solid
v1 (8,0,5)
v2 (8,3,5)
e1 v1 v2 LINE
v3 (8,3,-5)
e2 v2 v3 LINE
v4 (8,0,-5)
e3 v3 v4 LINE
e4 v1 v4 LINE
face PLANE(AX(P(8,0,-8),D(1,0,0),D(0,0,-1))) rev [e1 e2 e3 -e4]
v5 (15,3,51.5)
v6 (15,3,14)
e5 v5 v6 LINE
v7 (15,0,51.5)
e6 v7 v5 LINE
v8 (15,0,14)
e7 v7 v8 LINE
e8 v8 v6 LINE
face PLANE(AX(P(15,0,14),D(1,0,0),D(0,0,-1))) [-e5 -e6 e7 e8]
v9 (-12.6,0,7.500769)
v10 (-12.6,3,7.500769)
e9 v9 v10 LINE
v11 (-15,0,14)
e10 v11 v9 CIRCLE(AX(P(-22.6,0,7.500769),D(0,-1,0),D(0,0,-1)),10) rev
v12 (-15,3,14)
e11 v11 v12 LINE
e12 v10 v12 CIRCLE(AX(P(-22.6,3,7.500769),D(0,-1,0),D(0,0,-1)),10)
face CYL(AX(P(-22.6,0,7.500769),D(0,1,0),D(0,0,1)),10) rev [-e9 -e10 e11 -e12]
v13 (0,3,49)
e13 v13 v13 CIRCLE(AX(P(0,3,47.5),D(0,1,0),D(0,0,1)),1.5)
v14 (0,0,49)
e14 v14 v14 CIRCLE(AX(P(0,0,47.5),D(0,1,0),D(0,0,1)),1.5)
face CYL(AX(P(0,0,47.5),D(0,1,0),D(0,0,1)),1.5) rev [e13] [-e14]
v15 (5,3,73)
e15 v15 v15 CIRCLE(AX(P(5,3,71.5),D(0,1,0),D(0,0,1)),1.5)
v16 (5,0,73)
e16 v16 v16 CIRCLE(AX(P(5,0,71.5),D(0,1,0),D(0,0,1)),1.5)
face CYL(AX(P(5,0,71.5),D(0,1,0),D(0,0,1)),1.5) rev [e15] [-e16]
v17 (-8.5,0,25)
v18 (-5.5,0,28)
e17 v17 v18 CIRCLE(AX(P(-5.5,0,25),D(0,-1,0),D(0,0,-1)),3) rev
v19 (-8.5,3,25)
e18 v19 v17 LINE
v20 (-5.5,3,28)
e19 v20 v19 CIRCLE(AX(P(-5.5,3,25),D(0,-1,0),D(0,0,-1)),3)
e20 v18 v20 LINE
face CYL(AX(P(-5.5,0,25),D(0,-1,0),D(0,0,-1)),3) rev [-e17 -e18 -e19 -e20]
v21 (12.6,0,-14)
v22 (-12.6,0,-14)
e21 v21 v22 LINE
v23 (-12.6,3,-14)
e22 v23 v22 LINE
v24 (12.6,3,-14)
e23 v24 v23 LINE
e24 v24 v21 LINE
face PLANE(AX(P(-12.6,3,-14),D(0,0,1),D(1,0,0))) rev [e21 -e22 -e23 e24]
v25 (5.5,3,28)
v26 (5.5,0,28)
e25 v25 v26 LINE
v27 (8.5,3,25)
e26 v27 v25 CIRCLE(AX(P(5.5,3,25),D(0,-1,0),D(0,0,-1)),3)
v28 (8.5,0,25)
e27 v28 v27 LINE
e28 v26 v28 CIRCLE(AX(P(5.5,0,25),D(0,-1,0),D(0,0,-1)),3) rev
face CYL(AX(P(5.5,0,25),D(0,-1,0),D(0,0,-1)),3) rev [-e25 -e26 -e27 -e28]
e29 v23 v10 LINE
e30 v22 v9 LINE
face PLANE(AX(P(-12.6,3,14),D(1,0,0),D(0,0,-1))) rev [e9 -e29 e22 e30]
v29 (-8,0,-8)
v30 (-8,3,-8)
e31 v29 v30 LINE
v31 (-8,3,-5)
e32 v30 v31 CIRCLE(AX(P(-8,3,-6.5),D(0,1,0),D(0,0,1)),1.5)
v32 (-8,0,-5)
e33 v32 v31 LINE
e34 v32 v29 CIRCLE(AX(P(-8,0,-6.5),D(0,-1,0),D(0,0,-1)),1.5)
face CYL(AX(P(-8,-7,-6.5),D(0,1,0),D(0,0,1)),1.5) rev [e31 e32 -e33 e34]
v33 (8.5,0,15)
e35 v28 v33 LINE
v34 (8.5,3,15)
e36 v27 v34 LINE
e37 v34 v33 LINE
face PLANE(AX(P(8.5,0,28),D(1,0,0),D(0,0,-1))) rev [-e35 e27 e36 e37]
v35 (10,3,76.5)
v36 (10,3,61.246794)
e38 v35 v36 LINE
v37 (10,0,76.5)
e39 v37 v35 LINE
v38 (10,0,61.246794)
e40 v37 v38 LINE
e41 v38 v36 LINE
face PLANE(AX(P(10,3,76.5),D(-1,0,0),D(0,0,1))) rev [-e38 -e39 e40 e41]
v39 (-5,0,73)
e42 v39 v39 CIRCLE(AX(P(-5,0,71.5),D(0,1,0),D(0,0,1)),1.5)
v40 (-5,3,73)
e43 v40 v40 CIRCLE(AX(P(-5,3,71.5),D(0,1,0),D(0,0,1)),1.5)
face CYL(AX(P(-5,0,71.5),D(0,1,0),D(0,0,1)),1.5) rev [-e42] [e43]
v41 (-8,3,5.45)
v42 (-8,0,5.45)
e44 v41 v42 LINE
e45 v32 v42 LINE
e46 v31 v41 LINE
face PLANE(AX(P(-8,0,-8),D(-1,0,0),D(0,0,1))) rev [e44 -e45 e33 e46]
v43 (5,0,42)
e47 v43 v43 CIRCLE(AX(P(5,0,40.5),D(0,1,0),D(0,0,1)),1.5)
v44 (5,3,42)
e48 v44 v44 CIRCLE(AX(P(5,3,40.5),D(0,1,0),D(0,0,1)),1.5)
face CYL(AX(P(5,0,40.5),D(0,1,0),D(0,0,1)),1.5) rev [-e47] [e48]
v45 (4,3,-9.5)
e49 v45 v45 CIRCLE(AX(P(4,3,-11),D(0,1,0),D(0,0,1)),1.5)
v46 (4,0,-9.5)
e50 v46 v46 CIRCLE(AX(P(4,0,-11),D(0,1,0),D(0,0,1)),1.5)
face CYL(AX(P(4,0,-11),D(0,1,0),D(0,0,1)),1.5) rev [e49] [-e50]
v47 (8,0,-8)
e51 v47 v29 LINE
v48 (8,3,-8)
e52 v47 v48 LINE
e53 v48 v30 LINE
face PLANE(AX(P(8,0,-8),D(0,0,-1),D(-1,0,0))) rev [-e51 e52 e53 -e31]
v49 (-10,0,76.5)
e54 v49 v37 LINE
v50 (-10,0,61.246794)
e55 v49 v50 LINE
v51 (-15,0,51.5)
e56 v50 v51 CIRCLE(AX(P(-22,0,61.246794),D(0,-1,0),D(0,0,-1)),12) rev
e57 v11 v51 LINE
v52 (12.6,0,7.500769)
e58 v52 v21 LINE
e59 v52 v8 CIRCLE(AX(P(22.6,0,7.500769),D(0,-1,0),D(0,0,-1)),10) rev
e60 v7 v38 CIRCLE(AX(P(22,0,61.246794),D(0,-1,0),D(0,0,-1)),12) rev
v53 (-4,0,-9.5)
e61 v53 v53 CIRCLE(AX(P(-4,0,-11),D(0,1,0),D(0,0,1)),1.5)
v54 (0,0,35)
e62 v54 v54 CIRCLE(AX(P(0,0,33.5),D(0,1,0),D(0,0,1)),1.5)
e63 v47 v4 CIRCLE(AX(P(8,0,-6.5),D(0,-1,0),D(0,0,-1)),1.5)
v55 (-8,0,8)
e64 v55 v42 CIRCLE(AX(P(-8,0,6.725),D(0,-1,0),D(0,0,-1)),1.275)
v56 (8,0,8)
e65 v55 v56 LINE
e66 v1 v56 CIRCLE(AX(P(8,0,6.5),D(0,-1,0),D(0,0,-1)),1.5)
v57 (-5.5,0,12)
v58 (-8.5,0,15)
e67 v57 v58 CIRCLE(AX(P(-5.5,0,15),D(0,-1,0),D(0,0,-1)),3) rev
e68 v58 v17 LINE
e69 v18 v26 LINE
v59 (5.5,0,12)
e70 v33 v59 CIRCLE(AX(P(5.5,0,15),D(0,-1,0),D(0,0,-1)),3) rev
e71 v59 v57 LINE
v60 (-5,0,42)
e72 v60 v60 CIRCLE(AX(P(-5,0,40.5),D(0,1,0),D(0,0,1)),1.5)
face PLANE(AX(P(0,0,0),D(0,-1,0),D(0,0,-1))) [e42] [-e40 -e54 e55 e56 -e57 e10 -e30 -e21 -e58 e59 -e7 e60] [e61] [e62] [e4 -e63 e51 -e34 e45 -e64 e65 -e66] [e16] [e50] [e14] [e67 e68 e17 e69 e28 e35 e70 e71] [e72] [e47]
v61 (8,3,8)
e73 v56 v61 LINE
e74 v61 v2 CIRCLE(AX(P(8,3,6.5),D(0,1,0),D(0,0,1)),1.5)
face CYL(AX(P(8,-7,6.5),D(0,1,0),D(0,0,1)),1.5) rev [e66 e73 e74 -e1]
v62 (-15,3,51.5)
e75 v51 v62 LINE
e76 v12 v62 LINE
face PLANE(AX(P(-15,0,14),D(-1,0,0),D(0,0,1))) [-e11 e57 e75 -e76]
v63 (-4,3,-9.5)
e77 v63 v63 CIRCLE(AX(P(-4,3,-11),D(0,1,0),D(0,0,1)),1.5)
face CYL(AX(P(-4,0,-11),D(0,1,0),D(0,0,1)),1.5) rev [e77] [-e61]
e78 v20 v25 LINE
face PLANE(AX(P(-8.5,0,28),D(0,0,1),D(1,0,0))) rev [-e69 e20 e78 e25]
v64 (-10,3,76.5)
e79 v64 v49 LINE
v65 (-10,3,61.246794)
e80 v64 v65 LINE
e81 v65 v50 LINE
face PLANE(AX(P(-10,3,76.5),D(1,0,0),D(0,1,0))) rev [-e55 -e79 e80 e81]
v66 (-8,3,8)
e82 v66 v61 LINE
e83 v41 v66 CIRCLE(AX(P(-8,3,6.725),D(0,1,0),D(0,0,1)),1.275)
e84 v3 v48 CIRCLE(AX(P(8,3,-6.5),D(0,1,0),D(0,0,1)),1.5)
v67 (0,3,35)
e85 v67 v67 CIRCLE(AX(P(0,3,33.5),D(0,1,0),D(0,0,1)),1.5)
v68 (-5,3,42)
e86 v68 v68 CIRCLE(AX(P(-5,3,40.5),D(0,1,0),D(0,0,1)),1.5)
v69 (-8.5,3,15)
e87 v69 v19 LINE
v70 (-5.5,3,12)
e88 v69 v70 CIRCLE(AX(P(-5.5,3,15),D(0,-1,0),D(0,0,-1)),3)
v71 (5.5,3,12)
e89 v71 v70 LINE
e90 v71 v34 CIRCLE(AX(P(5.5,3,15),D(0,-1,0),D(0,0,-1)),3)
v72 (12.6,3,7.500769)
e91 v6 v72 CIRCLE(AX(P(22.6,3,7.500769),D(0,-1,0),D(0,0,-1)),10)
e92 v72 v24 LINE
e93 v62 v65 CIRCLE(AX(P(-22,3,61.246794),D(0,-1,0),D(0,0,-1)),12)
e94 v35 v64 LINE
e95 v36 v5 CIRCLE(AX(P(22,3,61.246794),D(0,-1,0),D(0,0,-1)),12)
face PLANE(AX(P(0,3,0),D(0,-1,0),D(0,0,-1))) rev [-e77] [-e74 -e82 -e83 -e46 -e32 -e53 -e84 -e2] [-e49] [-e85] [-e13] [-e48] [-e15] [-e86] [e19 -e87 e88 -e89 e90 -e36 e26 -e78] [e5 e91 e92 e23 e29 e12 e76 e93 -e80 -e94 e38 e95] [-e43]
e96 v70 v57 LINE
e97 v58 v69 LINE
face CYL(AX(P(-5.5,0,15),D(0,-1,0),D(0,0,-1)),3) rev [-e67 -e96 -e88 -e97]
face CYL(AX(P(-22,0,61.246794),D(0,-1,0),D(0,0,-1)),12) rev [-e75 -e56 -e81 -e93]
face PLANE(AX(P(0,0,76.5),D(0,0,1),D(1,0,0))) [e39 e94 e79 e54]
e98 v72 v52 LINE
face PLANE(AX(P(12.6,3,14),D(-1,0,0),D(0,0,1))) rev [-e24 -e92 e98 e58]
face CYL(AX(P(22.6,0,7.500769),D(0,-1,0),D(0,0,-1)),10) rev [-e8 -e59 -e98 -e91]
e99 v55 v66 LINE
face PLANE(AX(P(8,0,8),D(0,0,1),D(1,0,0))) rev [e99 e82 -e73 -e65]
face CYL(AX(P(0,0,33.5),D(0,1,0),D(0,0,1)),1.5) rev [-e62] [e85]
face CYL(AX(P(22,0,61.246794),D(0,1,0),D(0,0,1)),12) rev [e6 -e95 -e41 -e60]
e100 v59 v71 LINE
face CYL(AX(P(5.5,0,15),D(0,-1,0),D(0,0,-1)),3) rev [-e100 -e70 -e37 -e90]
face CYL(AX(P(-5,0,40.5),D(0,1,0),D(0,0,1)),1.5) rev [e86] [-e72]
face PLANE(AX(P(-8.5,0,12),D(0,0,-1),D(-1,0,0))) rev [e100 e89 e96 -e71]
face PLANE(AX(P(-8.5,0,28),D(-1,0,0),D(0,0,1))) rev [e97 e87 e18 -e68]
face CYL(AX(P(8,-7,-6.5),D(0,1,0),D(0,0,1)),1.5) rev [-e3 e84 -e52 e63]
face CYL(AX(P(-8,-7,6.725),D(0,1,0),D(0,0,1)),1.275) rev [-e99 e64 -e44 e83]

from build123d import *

# Parameters (mm, degrees)
SKETCH_1_W          = 25.2
SKETCH_1_H          = 28
EXTRUDE_1_DEPTH     = 3
SKETCH_4_R          = 1.5
SKETCH_4_W          = 16
SKETCH_4_H          = 16
CUT_EXTRUDE_3_DEPTH = 20.072493282
SKETCH_6_W          = 30
SKETCH_6_H          = 37.5
EXTRUDE_2_DEPTH     = 3
SKETCH_7_R          = 1.5
CUT_EXTRUDE_5_DEPTH = 54.723830839
FILLET_1_R          = 10
SKETCH_8_W          = 17
SKETCH_8_H          = 16
CUT_EXTRUDE_6_DEPTH = 54.723830839
FILLET_2_R          = 3
SKETCH_5_R          = 1.5
SKETCH_5_R_2        = 1.275
CUT_EXTRUDE_7_DEPTH = 10
SKETCH_9_W          = 20
SKETCH_9_H          = 3
EXTRUDE_3_DEPTH     = 25
FILLET_3_R          = 12
SKETCH_12_R         = 1.5
CUT_EXTRUDE_9_DEPTH = 79.014421744


with BuildPart() as part:
    # 草图1 → 凸台-拉伸1 (new body)
    with BuildSketch(Plane(origin=(0, 0, 0), x_dir=(1, 0, 0), z_dir=(0, 1, 0))):
        Rectangle(SKETCH_1_W, SKETCH_1_H)
    extrude(amount=EXTRUDE_1_DEPTH)

    # 草图4 → 切除-拉伸3 (cut, through all)
    with BuildSketch(Plane(origin=(0, 3, 0), x_dir=(1, 0, 0), z_dir=(0, 1, 0))):
        with Locations(Location((4, 11, 0), (0, 0, 270))):
            Circle(SKETCH_4_R)
        with Locations(Location((-4, 11, 0), (0, 0, 270))):
            Circle(SKETCH_4_R)
        Rectangle(SKETCH_4_W, SKETCH_4_H)
    extrude(amount=-CUT_EXTRUDE_3_DEPTH, mode=Mode.SUBTRACT)

    # 草图6 → 凸台-拉伸2 (add)
    with BuildSketch(Plane(origin=(0, 3, 0), x_dir=(1, 0, 0), z_dir=(0, 1, 0))):
        with Locations((0, -32.75)):
            Rectangle(SKETCH_6_W, SKETCH_6_H)
    extrude(amount=-EXTRUDE_2_DEPTH)

    # 草图7 → 切除-拉伸5 (cut, through all)
    with BuildSketch(Plane(origin=(0, 3, 0), x_dir=(1, 0, 0), z_dir=(0, 1, 0))):
        with Locations(Location((0, -33.5, 0), (0, 0, 270))):
            Circle(SKETCH_7_R)
        with Locations(Location((-5, -40.5, 0), (0, 0, 270))):
            Circle(SKETCH_7_R)
        with Locations(Location((5, -40.5, 0), (0, 0, 270))):
            Circle(SKETCH_7_R)
        with Locations(Location((0, -47.5, 0), (0, 0, 270))):
            Circle(SKETCH_7_R)
    extrude(amount=-CUT_EXTRUDE_5_DEPTH, mode=Mode.SUBTRACT)

    # 圆角1
    # the kernel refuses this fillet: 10 mm, written as the material it adds along each edge
    with BuildSketch(Plane(origin=(12.6, 0, 14), x_dir=(0, 0, -1), z_dir=(0, 1, 0))) as fillet_1_piece_1:
        with BuildLine():
            CenterArc((6.499230724, -10), FILLET_1_R, 90, 40.535802111)
            Line((0, -2.4), (-0.129984614, -2.248))
            ThreePointArc((-0.129984614, -2.248), (-0.2, -1.2), (-0.2, 0))
            Line((-0.2, 0), (0, 0.2))
            Line((0, 0.2), (6.499230724, 0.2))
            Line((6.499230724, 0.2), (6.499230724, 0))
        make_face()
    extrude(amount=3)
    with BuildSketch(Plane(origin=(-12.6, 0, 14), x_dir=(-1, 0, 0), z_dir=(0, 1, 0))) as fillet_1_piece_2:
        with BuildLine():
            CenterArc((10, -6.499230724), FILLET_1_R, 139.464197889, 40.535802111)
            Line((0, -6.499230724), (-0.2, -6.499230724))
            Line((-0.2, -6.499230724), (-0.2, 0))
            Line((-0.2, 0), (0, 0.2))
            ThreePointArc((0, 0.2), (1.2, 0.2), (2.248, 0.129984614))
            Line((2.248, 0.129984614), (2.4, 0))
        make_face()
    extrude(amount=3)

    # 草图8 → 切除-拉伸6 (cut, through all)
    with BuildSketch(Plane(origin=(0, 3, 0), x_dir=(1, 0, 0), z_dir=(0, 1, 0))):
        with Locations((0, -20)):
            Rectangle(SKETCH_8_W, SKETCH_8_H)
    extrude(amount=-CUT_EXTRUDE_6_DEPTH, mode=Mode.SUBTRACT)

    # 圆角2
    fillet_2_edges = [part.edges().sort_by_distance(p)[0] for p in [
        (8.5, 1.5, 12),
        (8.5, 1.5, 28),
        (-8.5, 1.5, 28),
        (-8.5, 1.5, 12),
    ]]
    fillet(fillet_2_edges, radius=FILLET_2_R)

    # 草图5 → 切除-拉伸7 (cut)
    with BuildSketch(Plane(origin=(0, 3, 0), x_dir=(1, 0, 0), z_dir=(0, 1, 0))):
        with Locations((8, 6.5)):
            Circle(SKETCH_5_R)
        with Locations((-8, 6.5)):
            Circle(SKETCH_5_R)
        with Locations((8, -6.5)):
            Circle(SKETCH_5_R)
        with Locations((-8, -6.725)):
            Circle(SKETCH_5_R_2)
    extrude(amount=-CUT_EXTRUDE_7_DEPTH, mode=Mode.SUBTRACT)

    # 草图9 → 凸台-拉伸3 (add)
    with BuildSketch(Plane.XY.offset(51.5)):
        with Locations((0, 1.5)):
            Rectangle(SKETCH_9_W, SKETCH_9_H)
    extrude(amount=EXTRUDE_3_DEPTH)

    # 圆角3
    # the kernel refuses this fillet: 12 mm, written as the material it adds along each edge
    with BuildSketch(Plane(origin=(10, 3, 51.5), x_dir=(1, 0, 0), z_dir=(0, -1, 0)), Plane(origin=(-10, 0, 51.5), x_dir=(-1, 0, 0), z_dir=(0, 1, 0))) as fillet_3_piece_1:
        with BuildLine():
            CenterArc((12, 9.746794345), FILLET_3_R, 180, 54.314665287)
            Line((0, 9.746794345), (-0.24, 9.746794345))
            Line((-0.24, 9.746794345), (-0.24, 0))
            Line((-0.24, 0), (0, -0.24))
            ThreePointArc((0, -0.24), (2.5, -0.24), (4.86, -0.194935887))
            Line((4.86, -0.194935887), (5, 0))
        make_face()
    extrude(amount=3)

    # 草图12 → 切除-拉伸9 (cut, through all)
    with BuildSketch(Plane(origin=(0, 3, 0), x_dir=(1, 0, 0), z_dir=(0, 1, 0))):
        with Locations(Location((5, -71.5, 0), (0, 0, 270))):
            Circle(SKETCH_12_R)
        with Locations(Location((-5, -71.5, 0), (0, 0, 270))):
            Circle(SKETCH_12_R)
    extrude(amount=-CUT_EXTRUDE_9_DEPTH, mode=Mode.SUBTRACT)


solid = part.part
